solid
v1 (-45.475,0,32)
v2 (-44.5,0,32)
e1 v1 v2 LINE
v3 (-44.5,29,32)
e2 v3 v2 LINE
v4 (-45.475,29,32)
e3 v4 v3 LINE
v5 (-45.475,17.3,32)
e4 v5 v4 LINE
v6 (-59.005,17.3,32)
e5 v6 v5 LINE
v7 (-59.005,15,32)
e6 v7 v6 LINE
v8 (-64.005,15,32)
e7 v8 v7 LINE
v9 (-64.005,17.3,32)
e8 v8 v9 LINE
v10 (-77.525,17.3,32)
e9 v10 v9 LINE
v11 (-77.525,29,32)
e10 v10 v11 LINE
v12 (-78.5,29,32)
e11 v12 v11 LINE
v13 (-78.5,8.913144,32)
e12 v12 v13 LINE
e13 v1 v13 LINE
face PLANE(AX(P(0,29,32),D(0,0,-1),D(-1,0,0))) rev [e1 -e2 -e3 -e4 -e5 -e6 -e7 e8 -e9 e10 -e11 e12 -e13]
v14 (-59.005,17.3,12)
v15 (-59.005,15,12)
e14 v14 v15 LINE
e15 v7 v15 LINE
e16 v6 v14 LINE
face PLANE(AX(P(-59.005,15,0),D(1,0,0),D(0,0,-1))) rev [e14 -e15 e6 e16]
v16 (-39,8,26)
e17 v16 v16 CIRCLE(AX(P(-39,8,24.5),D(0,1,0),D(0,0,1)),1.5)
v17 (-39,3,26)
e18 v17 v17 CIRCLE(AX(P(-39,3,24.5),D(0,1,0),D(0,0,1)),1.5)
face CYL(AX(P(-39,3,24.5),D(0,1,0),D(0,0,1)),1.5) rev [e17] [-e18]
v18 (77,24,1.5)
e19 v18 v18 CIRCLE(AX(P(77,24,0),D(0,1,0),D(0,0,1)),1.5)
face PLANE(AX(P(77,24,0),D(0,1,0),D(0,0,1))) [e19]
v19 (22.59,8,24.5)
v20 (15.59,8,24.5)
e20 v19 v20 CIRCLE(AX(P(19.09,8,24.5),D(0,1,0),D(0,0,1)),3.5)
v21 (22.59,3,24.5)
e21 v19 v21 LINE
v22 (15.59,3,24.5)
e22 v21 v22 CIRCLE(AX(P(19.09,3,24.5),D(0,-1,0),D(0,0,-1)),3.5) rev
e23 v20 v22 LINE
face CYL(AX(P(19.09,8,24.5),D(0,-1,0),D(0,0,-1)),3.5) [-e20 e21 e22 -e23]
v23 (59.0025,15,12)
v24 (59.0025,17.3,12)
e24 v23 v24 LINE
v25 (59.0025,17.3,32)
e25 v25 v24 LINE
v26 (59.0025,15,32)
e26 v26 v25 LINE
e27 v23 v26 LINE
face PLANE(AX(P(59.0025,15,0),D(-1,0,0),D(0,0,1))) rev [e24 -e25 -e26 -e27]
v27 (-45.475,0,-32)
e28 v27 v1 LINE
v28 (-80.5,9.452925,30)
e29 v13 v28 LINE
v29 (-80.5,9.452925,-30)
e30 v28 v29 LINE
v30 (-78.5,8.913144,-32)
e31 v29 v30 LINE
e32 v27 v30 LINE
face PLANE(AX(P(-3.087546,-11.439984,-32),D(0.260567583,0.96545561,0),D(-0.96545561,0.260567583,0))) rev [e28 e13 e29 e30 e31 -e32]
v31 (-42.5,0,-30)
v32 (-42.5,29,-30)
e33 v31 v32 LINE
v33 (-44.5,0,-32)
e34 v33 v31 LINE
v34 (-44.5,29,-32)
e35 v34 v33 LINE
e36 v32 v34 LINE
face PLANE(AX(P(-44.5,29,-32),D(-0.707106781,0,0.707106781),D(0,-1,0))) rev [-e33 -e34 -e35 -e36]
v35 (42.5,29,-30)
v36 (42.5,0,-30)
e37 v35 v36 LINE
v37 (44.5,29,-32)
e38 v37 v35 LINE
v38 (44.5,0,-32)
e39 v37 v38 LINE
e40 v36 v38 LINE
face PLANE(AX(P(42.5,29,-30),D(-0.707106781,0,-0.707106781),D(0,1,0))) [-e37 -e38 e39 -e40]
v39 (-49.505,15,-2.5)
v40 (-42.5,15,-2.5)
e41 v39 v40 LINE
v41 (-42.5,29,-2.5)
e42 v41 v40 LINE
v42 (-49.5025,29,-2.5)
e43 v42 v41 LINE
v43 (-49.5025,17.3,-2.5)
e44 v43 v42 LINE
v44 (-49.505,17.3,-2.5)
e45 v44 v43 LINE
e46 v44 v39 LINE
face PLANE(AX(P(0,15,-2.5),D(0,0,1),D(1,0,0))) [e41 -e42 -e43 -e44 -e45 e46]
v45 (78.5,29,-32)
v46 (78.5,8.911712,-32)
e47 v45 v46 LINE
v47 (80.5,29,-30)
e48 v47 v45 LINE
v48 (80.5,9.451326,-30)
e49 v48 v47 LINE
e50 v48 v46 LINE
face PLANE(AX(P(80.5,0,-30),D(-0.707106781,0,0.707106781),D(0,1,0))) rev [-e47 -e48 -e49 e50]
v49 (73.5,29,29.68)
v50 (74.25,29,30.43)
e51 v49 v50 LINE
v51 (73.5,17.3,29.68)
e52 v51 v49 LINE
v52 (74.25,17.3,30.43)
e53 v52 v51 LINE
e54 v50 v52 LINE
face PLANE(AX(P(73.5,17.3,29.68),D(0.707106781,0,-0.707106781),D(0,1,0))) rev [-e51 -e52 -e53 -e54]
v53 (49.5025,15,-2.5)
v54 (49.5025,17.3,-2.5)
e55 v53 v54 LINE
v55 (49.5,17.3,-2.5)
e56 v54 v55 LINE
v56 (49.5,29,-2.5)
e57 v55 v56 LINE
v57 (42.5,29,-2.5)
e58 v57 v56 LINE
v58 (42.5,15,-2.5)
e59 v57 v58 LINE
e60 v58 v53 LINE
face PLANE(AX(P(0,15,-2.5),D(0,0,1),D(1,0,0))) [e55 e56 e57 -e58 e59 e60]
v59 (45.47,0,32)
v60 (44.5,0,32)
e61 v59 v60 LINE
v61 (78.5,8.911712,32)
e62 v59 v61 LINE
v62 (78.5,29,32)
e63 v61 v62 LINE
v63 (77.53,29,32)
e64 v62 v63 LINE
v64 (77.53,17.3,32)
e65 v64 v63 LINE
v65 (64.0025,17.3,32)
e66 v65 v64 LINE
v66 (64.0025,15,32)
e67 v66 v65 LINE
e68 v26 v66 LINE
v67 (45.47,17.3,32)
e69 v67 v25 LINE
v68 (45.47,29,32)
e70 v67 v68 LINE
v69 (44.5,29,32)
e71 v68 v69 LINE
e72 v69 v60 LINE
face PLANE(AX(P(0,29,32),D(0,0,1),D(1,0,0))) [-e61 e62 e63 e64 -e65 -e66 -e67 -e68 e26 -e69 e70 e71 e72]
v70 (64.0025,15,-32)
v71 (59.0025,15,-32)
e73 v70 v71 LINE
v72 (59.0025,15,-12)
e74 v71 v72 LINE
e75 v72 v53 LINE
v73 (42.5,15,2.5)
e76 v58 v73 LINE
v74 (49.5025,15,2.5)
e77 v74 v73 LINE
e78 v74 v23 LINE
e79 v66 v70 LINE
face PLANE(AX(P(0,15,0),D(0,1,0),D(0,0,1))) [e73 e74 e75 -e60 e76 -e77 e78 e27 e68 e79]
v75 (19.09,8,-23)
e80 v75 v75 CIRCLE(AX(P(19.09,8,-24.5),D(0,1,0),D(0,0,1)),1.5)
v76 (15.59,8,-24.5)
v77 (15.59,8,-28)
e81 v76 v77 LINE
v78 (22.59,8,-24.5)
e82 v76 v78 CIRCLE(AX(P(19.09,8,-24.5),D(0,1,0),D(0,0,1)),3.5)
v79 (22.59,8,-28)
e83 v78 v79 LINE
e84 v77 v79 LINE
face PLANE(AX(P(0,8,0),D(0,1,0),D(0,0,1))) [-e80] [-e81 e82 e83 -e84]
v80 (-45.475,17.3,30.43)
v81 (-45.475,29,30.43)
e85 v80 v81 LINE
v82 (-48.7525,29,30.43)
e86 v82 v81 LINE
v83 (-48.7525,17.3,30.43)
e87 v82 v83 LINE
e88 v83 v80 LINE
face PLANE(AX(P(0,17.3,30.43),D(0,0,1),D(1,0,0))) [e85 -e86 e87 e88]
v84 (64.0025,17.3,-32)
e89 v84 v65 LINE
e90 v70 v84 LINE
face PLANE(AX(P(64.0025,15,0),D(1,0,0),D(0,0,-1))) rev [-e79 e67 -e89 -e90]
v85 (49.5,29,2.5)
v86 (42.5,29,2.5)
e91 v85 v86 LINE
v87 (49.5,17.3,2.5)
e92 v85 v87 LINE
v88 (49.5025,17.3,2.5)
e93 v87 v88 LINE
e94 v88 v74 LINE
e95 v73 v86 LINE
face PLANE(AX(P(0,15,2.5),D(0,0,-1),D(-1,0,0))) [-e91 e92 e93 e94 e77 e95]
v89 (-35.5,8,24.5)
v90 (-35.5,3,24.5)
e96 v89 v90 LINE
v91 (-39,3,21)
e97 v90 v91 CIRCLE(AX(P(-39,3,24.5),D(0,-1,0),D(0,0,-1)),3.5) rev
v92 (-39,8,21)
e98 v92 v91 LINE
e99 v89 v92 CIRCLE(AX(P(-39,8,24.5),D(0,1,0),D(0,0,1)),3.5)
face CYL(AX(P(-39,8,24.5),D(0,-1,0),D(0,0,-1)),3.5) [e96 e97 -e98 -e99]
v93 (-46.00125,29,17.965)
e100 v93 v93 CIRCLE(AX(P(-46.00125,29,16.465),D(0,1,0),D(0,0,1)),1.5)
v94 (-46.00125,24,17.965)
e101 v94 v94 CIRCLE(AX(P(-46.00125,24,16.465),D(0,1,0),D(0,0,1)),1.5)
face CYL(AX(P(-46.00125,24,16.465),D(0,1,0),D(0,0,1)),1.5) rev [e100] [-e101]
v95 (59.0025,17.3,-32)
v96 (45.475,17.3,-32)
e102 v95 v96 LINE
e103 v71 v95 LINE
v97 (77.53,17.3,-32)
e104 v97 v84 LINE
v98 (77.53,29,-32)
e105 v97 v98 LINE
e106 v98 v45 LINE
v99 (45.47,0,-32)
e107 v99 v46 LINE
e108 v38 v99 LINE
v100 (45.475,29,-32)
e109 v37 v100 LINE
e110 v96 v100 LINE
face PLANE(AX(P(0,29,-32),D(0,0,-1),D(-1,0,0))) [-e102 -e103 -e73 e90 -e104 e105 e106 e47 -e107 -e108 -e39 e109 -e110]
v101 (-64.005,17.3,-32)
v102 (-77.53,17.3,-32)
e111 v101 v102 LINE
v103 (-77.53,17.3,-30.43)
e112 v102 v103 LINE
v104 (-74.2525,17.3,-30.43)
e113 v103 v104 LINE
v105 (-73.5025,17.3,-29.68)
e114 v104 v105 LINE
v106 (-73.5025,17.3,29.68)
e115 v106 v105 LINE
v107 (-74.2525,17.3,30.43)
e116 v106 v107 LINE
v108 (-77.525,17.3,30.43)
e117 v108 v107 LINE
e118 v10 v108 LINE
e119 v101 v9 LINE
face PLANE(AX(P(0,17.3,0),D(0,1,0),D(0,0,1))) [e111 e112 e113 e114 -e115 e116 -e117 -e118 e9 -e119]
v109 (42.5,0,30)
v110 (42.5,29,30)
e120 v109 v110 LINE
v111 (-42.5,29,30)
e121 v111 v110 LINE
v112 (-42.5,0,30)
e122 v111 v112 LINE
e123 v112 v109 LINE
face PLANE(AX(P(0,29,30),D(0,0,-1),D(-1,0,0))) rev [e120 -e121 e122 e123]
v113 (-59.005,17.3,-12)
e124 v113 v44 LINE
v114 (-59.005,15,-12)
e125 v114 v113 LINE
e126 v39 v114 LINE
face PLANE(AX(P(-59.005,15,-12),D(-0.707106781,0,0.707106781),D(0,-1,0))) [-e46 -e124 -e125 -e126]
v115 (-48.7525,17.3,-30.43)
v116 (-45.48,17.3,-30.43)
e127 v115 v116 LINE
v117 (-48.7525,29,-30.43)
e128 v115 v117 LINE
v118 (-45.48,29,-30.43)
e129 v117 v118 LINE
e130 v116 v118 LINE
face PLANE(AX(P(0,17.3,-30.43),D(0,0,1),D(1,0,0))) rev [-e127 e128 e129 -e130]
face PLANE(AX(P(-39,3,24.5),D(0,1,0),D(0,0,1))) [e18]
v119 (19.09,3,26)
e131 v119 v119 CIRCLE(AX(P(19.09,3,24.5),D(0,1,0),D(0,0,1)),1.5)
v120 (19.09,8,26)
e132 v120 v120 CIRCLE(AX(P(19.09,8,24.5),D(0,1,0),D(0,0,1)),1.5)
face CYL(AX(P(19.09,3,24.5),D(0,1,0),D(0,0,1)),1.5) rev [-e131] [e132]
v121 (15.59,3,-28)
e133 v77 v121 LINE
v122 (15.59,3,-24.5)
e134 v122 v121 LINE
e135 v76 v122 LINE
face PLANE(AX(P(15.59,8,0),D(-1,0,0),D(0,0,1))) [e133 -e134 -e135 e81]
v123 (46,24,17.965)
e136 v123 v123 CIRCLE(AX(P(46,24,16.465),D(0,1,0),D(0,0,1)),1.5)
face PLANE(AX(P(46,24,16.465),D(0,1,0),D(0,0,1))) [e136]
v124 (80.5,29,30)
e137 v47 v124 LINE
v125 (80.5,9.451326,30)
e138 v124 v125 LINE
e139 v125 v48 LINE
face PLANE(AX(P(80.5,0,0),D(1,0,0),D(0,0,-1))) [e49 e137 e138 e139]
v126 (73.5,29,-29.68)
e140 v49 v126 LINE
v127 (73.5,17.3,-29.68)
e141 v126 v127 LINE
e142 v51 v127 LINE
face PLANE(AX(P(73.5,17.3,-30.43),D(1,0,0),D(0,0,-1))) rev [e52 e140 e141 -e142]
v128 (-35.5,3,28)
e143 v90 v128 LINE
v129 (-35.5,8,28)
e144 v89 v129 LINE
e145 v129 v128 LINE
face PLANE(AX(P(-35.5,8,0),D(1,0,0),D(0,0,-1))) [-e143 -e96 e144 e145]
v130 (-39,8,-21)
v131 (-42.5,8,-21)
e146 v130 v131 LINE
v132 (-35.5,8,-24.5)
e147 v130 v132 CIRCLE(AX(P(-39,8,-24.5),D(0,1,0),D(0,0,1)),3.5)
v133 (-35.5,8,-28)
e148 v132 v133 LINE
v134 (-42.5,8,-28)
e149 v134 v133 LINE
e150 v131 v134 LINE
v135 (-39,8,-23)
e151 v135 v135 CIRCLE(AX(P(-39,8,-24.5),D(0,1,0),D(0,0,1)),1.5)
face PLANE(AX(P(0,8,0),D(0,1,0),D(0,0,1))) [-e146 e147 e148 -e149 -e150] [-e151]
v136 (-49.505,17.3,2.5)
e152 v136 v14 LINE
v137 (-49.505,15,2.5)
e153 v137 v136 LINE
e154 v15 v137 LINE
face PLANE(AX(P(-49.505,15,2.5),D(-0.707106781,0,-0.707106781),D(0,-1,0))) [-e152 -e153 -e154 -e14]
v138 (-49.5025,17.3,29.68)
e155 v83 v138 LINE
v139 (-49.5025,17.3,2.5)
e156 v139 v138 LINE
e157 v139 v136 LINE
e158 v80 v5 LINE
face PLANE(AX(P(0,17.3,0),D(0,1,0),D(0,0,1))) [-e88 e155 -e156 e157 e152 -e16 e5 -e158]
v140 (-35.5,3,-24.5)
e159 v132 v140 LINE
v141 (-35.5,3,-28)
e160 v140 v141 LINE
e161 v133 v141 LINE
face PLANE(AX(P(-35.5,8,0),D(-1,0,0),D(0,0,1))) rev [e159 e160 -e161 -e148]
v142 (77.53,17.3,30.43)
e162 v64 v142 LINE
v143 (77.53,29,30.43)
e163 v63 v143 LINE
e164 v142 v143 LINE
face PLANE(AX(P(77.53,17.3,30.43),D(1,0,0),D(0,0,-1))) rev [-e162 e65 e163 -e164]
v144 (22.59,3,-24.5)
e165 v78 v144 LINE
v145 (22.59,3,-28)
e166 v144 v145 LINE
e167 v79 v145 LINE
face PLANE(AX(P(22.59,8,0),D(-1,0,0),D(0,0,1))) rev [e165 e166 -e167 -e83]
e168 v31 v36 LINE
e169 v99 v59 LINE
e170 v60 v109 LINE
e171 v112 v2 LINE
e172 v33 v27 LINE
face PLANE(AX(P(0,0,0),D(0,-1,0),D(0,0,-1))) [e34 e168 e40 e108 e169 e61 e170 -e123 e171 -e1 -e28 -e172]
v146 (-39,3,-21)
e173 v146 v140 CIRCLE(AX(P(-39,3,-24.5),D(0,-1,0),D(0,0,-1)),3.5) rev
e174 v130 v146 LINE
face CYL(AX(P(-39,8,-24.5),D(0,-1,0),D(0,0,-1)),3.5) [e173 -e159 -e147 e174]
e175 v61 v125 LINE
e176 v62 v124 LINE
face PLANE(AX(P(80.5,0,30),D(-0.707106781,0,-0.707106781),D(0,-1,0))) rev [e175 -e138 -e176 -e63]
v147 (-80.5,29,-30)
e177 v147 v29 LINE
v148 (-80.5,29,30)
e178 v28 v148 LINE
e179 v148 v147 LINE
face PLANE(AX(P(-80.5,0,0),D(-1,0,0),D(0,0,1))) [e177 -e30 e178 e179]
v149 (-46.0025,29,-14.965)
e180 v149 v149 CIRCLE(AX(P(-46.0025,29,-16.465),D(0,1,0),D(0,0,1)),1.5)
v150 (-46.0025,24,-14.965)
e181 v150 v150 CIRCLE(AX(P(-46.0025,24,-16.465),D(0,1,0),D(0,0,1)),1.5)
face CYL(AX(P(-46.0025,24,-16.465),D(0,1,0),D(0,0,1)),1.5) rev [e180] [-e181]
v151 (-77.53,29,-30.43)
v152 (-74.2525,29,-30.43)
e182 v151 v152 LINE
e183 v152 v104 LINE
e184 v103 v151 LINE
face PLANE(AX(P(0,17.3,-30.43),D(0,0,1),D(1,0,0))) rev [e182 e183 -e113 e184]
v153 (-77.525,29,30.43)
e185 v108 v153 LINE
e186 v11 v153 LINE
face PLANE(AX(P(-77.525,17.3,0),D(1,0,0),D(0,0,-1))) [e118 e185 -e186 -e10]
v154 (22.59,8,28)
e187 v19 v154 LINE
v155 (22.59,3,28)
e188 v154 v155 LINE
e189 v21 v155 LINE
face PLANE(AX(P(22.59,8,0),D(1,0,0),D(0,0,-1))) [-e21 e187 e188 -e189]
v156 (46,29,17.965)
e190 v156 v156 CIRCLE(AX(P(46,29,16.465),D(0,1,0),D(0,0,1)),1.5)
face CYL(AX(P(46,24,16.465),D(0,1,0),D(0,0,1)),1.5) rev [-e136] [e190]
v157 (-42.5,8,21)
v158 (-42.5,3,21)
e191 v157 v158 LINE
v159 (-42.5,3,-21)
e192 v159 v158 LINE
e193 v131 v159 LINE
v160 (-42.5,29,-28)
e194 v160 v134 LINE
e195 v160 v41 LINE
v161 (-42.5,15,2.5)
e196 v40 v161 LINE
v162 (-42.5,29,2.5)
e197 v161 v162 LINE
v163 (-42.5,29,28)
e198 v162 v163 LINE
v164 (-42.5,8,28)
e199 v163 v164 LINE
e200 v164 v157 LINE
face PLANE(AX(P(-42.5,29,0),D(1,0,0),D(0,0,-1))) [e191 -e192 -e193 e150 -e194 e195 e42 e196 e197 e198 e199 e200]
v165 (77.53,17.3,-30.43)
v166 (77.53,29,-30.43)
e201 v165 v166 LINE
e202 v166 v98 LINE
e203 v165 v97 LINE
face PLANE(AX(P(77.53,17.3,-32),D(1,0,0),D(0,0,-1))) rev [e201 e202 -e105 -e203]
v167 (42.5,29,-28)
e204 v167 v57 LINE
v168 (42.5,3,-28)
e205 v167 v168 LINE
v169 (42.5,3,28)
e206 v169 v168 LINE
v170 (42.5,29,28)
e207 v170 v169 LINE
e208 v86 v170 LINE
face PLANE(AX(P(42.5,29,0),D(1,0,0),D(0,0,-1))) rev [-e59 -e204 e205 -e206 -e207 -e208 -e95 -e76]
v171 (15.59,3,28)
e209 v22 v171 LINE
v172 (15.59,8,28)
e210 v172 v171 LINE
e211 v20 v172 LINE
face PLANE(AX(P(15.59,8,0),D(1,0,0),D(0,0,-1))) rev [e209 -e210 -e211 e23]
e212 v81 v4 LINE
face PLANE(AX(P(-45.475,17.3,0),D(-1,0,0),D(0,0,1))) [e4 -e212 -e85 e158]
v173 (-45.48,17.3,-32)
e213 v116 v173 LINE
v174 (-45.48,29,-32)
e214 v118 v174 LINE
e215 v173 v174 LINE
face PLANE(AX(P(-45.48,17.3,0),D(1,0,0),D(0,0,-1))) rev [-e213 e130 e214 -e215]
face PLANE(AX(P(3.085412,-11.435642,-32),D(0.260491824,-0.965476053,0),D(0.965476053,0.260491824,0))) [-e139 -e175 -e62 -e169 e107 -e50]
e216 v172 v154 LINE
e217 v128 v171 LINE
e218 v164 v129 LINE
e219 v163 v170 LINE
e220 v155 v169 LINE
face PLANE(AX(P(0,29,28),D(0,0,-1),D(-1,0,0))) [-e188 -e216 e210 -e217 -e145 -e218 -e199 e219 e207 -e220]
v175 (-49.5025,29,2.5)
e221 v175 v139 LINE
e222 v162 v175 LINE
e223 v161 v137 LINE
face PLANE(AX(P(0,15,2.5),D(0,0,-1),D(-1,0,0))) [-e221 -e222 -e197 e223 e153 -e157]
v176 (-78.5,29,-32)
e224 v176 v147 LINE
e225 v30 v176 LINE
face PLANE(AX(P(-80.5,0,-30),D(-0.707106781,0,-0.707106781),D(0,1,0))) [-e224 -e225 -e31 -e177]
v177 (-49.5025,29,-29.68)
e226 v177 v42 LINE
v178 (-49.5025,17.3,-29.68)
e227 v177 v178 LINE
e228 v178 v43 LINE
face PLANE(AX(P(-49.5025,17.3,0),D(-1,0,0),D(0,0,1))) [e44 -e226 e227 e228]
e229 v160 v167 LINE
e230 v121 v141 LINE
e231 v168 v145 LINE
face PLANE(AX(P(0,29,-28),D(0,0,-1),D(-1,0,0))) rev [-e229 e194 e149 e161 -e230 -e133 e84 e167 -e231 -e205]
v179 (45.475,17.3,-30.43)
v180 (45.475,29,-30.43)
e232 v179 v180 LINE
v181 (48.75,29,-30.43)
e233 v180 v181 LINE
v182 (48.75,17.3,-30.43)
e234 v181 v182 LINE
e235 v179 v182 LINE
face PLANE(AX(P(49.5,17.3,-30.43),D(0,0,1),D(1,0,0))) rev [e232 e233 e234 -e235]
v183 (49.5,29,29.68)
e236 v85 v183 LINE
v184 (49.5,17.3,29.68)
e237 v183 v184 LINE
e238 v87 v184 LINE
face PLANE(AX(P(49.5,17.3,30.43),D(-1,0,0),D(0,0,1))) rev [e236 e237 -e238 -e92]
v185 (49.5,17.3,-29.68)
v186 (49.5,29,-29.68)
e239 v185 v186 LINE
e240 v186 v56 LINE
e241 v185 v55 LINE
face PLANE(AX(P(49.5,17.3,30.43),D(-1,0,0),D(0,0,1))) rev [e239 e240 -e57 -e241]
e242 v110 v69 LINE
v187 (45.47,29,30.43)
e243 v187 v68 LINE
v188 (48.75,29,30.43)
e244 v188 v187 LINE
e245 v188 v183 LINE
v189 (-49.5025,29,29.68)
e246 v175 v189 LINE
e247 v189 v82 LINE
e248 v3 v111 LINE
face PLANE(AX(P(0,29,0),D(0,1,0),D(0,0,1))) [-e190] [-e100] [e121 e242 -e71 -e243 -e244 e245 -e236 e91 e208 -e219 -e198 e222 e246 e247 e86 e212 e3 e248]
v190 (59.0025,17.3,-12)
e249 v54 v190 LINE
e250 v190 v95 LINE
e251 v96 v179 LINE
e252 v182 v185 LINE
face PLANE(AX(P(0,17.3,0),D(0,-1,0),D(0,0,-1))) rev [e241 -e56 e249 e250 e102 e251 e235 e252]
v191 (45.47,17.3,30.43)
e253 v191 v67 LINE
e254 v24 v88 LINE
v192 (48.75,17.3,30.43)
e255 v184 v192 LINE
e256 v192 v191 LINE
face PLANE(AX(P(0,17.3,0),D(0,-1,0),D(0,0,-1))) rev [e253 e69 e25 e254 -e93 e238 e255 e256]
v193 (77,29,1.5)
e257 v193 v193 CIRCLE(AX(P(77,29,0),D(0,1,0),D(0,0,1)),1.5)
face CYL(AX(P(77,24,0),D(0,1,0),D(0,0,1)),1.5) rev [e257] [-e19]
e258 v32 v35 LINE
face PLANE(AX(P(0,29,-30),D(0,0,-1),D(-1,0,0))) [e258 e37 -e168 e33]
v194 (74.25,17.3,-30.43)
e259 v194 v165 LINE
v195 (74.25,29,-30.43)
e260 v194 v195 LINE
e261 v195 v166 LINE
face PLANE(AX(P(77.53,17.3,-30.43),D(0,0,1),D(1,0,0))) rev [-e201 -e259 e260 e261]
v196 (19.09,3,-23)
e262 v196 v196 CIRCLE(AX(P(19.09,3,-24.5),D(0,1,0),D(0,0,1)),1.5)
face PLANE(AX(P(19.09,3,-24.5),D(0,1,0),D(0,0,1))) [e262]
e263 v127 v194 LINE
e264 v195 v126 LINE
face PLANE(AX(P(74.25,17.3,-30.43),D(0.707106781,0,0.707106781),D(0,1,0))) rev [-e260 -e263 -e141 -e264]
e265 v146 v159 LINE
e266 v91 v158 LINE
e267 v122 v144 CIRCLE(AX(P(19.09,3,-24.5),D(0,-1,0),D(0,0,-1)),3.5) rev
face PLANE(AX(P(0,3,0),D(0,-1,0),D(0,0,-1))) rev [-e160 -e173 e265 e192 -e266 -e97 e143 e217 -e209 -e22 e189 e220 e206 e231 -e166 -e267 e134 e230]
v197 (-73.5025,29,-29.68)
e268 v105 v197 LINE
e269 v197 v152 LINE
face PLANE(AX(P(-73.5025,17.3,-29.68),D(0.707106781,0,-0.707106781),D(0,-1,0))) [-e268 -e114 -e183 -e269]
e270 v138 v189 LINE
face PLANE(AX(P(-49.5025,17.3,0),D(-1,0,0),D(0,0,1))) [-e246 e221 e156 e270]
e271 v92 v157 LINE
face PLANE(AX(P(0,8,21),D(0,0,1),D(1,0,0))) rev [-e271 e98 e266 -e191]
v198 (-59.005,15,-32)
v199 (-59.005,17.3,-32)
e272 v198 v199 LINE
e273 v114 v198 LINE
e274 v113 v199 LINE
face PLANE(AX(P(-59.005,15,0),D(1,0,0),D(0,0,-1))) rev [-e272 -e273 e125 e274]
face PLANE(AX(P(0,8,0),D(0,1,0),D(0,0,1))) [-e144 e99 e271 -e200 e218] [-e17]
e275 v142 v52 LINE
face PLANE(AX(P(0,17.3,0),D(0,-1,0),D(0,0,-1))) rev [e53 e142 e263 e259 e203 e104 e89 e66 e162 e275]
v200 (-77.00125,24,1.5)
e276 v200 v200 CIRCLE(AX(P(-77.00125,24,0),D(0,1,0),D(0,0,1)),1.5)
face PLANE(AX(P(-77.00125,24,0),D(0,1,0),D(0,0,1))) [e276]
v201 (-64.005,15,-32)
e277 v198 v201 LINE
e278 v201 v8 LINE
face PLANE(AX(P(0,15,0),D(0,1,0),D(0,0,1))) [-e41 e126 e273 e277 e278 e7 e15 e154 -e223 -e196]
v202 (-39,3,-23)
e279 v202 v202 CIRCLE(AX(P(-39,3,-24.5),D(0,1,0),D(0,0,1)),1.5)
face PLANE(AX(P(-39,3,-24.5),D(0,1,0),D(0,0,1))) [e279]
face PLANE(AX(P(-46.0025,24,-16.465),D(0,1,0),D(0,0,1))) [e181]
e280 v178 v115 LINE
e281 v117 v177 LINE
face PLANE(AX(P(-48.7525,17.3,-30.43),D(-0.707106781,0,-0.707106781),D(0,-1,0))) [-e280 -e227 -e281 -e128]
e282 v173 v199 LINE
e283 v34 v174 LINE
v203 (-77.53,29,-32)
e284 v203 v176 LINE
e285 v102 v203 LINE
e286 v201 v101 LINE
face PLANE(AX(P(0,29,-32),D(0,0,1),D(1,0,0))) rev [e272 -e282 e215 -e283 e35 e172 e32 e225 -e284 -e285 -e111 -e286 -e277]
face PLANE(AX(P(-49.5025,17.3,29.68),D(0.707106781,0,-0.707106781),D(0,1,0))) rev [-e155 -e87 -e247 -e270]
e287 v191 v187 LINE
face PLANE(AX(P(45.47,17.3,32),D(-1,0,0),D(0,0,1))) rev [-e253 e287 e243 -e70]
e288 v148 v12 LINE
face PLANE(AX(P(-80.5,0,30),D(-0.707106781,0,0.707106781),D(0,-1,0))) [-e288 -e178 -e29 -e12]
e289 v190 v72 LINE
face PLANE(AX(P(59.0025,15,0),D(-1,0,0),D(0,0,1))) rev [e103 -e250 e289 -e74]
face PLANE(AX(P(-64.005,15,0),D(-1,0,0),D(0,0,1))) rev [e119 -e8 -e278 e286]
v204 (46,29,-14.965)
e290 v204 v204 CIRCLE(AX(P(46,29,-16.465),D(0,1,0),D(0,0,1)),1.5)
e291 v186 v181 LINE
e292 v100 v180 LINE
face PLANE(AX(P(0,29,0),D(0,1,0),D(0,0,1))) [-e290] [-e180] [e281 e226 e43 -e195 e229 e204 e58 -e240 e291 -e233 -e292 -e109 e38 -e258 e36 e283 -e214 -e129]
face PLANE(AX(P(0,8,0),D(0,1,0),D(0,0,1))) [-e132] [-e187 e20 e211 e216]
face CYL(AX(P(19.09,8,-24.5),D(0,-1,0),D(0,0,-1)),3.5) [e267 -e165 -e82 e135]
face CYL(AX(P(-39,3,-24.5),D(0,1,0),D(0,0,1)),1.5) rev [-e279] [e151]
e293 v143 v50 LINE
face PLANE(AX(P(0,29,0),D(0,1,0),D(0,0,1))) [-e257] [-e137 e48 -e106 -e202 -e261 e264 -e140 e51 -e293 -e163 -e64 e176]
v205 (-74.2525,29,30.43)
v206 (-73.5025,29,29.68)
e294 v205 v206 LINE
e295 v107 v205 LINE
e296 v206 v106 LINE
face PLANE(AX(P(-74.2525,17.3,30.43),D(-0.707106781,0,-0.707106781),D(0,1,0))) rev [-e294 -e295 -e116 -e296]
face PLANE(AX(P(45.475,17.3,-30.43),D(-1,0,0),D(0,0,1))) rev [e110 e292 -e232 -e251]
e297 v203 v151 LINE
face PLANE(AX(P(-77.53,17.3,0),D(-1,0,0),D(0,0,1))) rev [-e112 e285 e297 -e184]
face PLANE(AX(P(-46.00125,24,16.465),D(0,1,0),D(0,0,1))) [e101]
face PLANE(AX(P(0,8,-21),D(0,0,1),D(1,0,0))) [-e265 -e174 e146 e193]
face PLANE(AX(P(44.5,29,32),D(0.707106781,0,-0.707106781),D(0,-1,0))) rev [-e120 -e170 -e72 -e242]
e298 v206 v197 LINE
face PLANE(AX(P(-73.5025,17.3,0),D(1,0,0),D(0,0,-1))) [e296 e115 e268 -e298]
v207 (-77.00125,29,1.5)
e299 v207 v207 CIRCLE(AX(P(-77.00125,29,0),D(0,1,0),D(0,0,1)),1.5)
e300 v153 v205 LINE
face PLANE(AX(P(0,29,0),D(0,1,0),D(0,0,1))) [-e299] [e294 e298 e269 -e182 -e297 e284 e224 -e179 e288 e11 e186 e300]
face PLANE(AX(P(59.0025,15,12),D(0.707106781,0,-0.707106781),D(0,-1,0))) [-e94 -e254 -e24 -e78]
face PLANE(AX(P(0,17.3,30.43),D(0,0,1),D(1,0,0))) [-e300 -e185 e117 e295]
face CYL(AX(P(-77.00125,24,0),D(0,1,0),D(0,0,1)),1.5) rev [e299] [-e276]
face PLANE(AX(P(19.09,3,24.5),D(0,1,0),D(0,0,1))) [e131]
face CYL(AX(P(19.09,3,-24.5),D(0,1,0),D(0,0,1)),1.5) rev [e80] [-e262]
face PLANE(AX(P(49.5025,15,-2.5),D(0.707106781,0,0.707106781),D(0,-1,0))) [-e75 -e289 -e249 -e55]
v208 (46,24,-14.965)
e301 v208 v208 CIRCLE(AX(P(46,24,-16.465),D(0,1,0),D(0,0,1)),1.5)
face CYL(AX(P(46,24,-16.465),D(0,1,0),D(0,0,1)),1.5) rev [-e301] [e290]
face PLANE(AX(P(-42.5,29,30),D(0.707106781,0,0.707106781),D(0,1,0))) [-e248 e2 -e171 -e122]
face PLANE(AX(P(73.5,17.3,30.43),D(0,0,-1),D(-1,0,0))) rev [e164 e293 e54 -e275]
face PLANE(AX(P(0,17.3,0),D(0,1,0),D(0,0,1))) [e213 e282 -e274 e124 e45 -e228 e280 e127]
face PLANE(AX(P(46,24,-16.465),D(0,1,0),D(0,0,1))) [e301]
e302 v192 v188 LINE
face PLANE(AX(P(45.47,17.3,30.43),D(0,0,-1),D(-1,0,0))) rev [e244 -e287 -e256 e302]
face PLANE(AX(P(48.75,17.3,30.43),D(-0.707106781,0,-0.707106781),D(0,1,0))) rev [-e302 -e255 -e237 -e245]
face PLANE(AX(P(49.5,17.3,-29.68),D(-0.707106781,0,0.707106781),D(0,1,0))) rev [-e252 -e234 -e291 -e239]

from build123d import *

# Parameters (mm, degrees)
SKETCH2_W            = 85
SKETCH2_H            = 56
BOSS_EXTRUDE4_DEPTH  = 3
SKETCH3_W            = 89
SKETCH3_H            = 60
SKETCH3_W_2          = 85
SKETCH3_H_2          = 56
BOSS_EXTRUDE5_DEPTH  = 29
SKETCH5_R            = 3.5
BOSS_EXTRUDE10_DEPTH = 8
CUT_EXTRUDE1_DEPTH   = 11.7
CHAMFER1_SIZE        = 2
CUT_EXTRUDE2_DEPTH   = 11.7
SKETCH8_W            = 64
SKETCH8_H            = 29
BOSS_EXTRUDE11_DEPTH = 2
SKETCH9_W            = 64
SKETCH9_H            = 29
BOSS_EXTRUDE12_DEPTH = 2
CHAMFER2_SIZE        = 2
CHAMFER3_SIZE        = 0.75
CUT_EXTRUDE4_DEPTH   = 107.851532511
SKETCH10_W           = 7.0025
SKETCH10_H           = 5
SKETCH10_W_2         = 85
SKETCH10_W_3         = 7
CUT_EXTRUDE5_DEPTH   = 14
CHAMFER4_SIZE        = 9.5
SKETCH14_R           = 1.5
CUT_EXTRUDE7_DEPTH   = 5
SKETCH15_R           = 1.5
CUT_EXTRUDE8_DEPTH   = 5


with BuildPart() as part:
    # Sketch2 → Boss-Extrude4 (new body)
    with BuildSketch(Plane(origin=(0, 0, 0), x_dir=(1, 0, 0), z_dir=(0, 1, 0))):
        Rectangle(SKETCH2_W, SKETCH2_H)
    extrude(amount=BOSS_EXTRUDE4_DEPTH)

    # Sketch3 → Boss-Extrude5 (add)
    # profile 1 of 3: a face of its own
    with BuildSketch(Plane(origin=(0, 0, 0), x_dir=(1, 0, 0), z_dir=(0, 1, 0))):
        Rectangle(SKETCH3_W, SKETCH3_H)
        Rectangle(SKETCH3_W_2, SKETCH3_H_2, mode=Mode.SUBTRACT)
    # profile 2 of 3: a face of its own
    with BuildSketch(Plane(origin=(0, 0, 0), x_dir=(1, 0, 0), z_dir=(0, 1, 0))):
        Polygon((-78.5, -32), (-44.5, -32), (-44.5, -30), (-44.5, 30), (-44.5, 32), (-78.5, 32), (-78.5, 0), align=None)
    # profile 3 of 3: a face of its own
    with BuildSketch(Plane(origin=(0, 0, 0), x_dir=(1, 0, 0), z_dir=(0, 1, 0))):
        Polygon((44.5, -32), (44.5, -30), (44.5, 30), (44.5, 32), (78.5, 32), (78.5, 0), (78.5, -32), align=None)
    extrude(amount=BOSS_EXTRUDE5_DEPTH)

    # Sketch5 → Boss-Extrude10 (add)
    with BuildSketch(Plane(origin=(0, 0, 0), x_dir=(1, 0, 0), z_dir=(0, 1, 0))):
        with Locations((-39, 24.5)):
            Circle(SKETCH5_R)
        with BuildLine():
            ThreePointArc((-42.5, 24.5), (-41.474873734, 26.974873734), (-39, 28))
            Line((-39, 28), (-42.5, 28))
            Line((-42.5, 28), (-42.5, 24.5))
        make_face()
        with BuildLine():
            ThreePointArc((-39, 21), (-41.474873734, 22.025126266), (-42.5, 24.5))
            Line((-42.5, 24.5), (-42.5, 21))
            Line((-42.5, 21), (-39, 21))
        make_face()
        with BuildLine():
            Line((-35.5, 24.5), (-35.5, 28))
            Line((-35.5, 28), (-39, 28))
            ThreePointArc((-39, 28), (-36.525126266, 26.974873734), (-35.5, 24.5))
        make_face()
        with BuildLine():
            ThreePointArc((-35.5, -24.5), (-36.525126266, -26.974873734), (-39, -28))
            Line((-39, -28), (-35.5, -28))
            Line((-35.5, -28), (-35.5, -24.5))
        make_face()
        with Locations((-39, -24.5)):
            Circle(SKETCH5_R)
        with BuildLine():
            ThreePointArc((-39, -28), (-41.474873734, -26.974873734), (-42.5, -24.5))
            Line((-42.5, -24.5), (-42.5, -28))
            Line((-42.5, -28), (-39, -28))
        make_face()
        with BuildLine():
            Line((-39, -21), (-42.5, -21))
            Line((-42.5, -21), (-42.5, -24.5))
            ThreePointArc((-42.5, -24.5), (-41.474873734, -22.025126266), (-39, -21))
        make_face()
        with BuildLine():
            Line((19.08999999, -28), (22.59, -28))
            Line((22.59, -28), (22.59, -24.5))
            ThreePointArc((22.59, -24.5), (21.564873731, -26.974873738), (19.08999999, -28))
        make_face()
        with Locations((19.09, -24.5)):
            Circle(SKETCH5_R)
        with BuildLine():
            Line((15.59, -28), (19.08999999, -28))
            ThreePointArc((19.08999999, -28), (16.615126262, -26.974873731), (15.59, -24.5))
            Line((15.59, -24.5), (15.59, -28))
        make_face()
        with BuildLine():
            ThreePointArc((19.09, 28), (21.564873734, 26.974873734), (22.59, 24.5))
            Line((22.59, 24.5), (22.59, 28))
            Line((22.59, 28), (19.09, 28))
        make_face()
        with BuildLine():
            Line((15.59, 28), (15.59, 24.5))
            ThreePointArc((15.59, 24.5), (16.615126266, 26.974873734), (19.09, 28))
            Line((19.09, 28), (15.59, 28))
        make_face()
        with Locations((19.09, 24.5)):
            Circle(SKETCH5_R)
    extrude(amount=BOSS_EXTRUDE10_DEPTH)

    # Sketch6 → Cut-Extrude1 (cut)
    with BuildSketch(Plane(origin=(0, 29, 0), x_dir=(1, 0, 0), z_dir=(0, 1, 0))):
        Polygon((-73.5025, 30.43), (-49.5025, 30.43), (-45.48, 30.43), (-45.48, 32), (-77.53, 32), (-77.53, 30.43), align=None)
        Polygon((-73.5025, -30.43), (-49.5025, -30.43), (-49.5025, 0), (-49.5025, 30.43), (-73.5025, 30.43), (-73.5025, 0), align=None)
        Polygon((-77.525, -32), (-45.475, -32), (-45.475, -30.43), (-49.5025, -30.43), (-73.5025, -30.43), (-77.525, -30.43), align=None)
    extrude(amount=-CUT_EXTRUDE1_DEPTH, mode=Mode.SUBTRACT)

    # Chamfer1
    chamfer1_edges = [part.edges().sort_by_distance(p)[0] for p in [
        (-44.5, 14.5, 30),
        (44.5, 14.5, 30),
        (44.5, 14.5, -30),
        (-44.5, 14.5, -30),
    ]]
    chamfer(chamfer1_edges, length=CHAMFER1_SIZE - 0.0001)  # a hair under: the kernel refuses the full size

    # Sketch7 → Cut-Extrude2 (cut)
    with BuildSketch(Plane(origin=(0, 29, 0), x_dir=(1, 0, 0), z_dir=(0, 1, 0))):
        Polygon((61.5, 32), (45.475, 32), (45.475, 30.43), (49.5, 30.43), (49.5, -30.43), (45.47, -30.43), (45.47, -32), (61.5, -32), (77.53, -32), (77.53, -30.43), (73.5, -30.43), (73.5, 30.43), (77.53, 30.43), (77.53, 32), align=None)
    extrude(amount=-CUT_EXTRUDE2_DEPTH, mode=Mode.SUBTRACT)

    # Sketch8 → Boss-Extrude11 (add)
    with BuildSketch(Plane.ZY.offset(78.5)):
        with Locations((0, 14.5)):
            Rectangle(SKETCH8_W, SKETCH8_H)
    extrude(amount=BOSS_EXTRUDE11_DEPTH)

    # Sketch9 → Boss-Extrude12 (add)
    with BuildSketch(Plane(origin=(78.5, 0, 0), x_dir=(0, 0, -1), z_dir=(1, 0, 0))):
        with Locations((0, 14.5)):
            Rectangle(SKETCH9_W, SKETCH9_H)
    extrude(amount=BOSS_EXTRUDE12_DEPTH)

    # Chamfer2
    chamfer2_edges = [part.edges().sort_by_distance(p)[0] for p in [
        (-80.5, 14.5, -32),
        (-80.5, 14.5, 32),
        (80.5, 14.5, 32),
        (80.5, 14.5, -32),
    ]]
    chamfer(chamfer2_edges, length=CHAMFER2_SIZE)

    # Chamfer3
    chamfer3_edges = [part.edges().sort_by_distance(p)[0] for p in [
        (-73.5025, 23.15, -30.43),
        (-49.5025, 23.15, -30.43),
        (-49.5025, 23.15, 30.43),
        (-73.5025, 23.15, 30.43),
        (73.5, 23.15, -30.43),
        (73.5, 23.15, 30.43),
        (49.5, 23.15, 30.43),
        (49.5, 23.15, -30.43),
    ]]
    chamfer(chamfer3_edges, length=CHAMFER3_SIZE)

    # Sketch11 → Cut-Extrude4 (cut, through all)
    with BuildSketch(Plane.XY.offset(32)):
        Polygon((104.627072185, -13.366120131), (45.47, 0), (77.53, 8.65), (97.251349741, 13.97095057), align=None)
        Polygon((-80.747190975, -16.87538219), (-45.475, 0), (-78.5, 0), (-78.5, 8.913143526), (-93.850671493, 13.056148468), align=None)
        Polygon((-45.475, 0), (-77.525, 8.65), (-78.5, 8.913143526), (-78.5, 0), align=None)
    extrude(amount=-CUT_EXTRUDE4_DEPTH, mode=Mode.SUBTRACT)

    # Sketch10 → Cut-Extrude5 (cut)
    with BuildSketch(Plane(origin=(0, 29, 0), x_dir=(1, 0, 0), z_dir=(0, 1, 0))):
        Polygon((-59.005, -32), (-59.005, 32), (-61.505, 32), (-64.005, 32), (-64.005, -32), (-61.5, -32), align=None)
        Polygon((-49.5025, 2.5), (-59.005, 2.5), (-59.005, 0), (-59.005, -2.5), (-49.5025, -2.5), align=None)
        with Locations((-46.00125, 0)):
            Rectangle(SKETCH10_W, SKETCH10_H)
        Rectangle(SKETCH10_W_2, SKETCH10_H)
        with Locations((46, 0)):
            Rectangle(SKETCH10_W_3, SKETCH10_H)
        Polygon((59.0025, 2.5), (49.5, 2.5), (49.5, -2.5), (59.0025, -2.5), (59.0025, 0), align=None)
        Polygon((64.0025, -32), (64.0025, 32), (61.5025, 32), (59.0025, 32), (59.0025, -32), (61.5, -32), align=None)
    extrude(amount=-CUT_EXTRUDE5_DEPTH, mode=Mode.SUBTRACT)

    # Chamfer4
    chamfer4_edges = [part.edges().sort_by_distance(p)[0] for p in [
        (-59.005, 16.15, -2.5),
        (59.0025, 16.15, -2.5),
        (59.0025, 16.15, 2.5),
        (-59.005, 16.15, 2.5),
    ]]
    chamfer(chamfer4_edges, length=CHAMFER4_SIZE)

    # Sketch14 → Cut-Extrude7 (cut)
    with BuildSketch(Plane(origin=(0, 8, 0), x_dir=(1, 0, 0), z_dir=(0, 1, 0))):
        with Locations(Location((19.09, -24.5, 0), (0, 0, 270))):
            Circle(SKETCH14_R)
        with Locations(Location((-39, -24.5, 0), (0, 0, 270))):
            Circle(SKETCH14_R)
        with Locations(Location((-39, 24.5, 0), (0, 0, 270))):
            Circle(SKETCH14_R)
        with Locations(Location((19.09, 24.5, 0), (0, 0, 270))):
            Circle(SKETCH14_R)
    extrude(amount=-CUT_EXTRUDE7_DEPTH, mode=Mode.SUBTRACT)

    # Sketch15 → Cut-Extrude8 (cut)
    with BuildSketch(Plane(origin=(0, 29, 0), x_dir=(1, 0, 0), z_dir=(0, 1, 0))):
        with Locations(Location((46, 16.465, 0), (0, 0, 270))):
            Circle(SKETCH15_R)
        with Locations(Location((46, -16.465, 0), (0, 0, 270))):
            Circle(SKETCH15_R)
        with Locations(Location((77, 0, 0), (0, 0, 270))):
            Circle(SKETCH15_R)
        with Locations(Location((-46.0025, 16.465, 0), (0, 0, 270))):
            Circle(SKETCH15_R)
        with Locations(Location((-46.00125, -16.465, 0), (0, 0, 270))):
            Circle(SKETCH15_R)
        with Locations(Location((-77.00125, 0, 0), (0, 0, 270))):
            Circle(SKETCH15_R)
    extrude(amount=-CUT_EXTRUDE8_DEPTH, mode=Mode.SUBTRACT)


solid = part.part
